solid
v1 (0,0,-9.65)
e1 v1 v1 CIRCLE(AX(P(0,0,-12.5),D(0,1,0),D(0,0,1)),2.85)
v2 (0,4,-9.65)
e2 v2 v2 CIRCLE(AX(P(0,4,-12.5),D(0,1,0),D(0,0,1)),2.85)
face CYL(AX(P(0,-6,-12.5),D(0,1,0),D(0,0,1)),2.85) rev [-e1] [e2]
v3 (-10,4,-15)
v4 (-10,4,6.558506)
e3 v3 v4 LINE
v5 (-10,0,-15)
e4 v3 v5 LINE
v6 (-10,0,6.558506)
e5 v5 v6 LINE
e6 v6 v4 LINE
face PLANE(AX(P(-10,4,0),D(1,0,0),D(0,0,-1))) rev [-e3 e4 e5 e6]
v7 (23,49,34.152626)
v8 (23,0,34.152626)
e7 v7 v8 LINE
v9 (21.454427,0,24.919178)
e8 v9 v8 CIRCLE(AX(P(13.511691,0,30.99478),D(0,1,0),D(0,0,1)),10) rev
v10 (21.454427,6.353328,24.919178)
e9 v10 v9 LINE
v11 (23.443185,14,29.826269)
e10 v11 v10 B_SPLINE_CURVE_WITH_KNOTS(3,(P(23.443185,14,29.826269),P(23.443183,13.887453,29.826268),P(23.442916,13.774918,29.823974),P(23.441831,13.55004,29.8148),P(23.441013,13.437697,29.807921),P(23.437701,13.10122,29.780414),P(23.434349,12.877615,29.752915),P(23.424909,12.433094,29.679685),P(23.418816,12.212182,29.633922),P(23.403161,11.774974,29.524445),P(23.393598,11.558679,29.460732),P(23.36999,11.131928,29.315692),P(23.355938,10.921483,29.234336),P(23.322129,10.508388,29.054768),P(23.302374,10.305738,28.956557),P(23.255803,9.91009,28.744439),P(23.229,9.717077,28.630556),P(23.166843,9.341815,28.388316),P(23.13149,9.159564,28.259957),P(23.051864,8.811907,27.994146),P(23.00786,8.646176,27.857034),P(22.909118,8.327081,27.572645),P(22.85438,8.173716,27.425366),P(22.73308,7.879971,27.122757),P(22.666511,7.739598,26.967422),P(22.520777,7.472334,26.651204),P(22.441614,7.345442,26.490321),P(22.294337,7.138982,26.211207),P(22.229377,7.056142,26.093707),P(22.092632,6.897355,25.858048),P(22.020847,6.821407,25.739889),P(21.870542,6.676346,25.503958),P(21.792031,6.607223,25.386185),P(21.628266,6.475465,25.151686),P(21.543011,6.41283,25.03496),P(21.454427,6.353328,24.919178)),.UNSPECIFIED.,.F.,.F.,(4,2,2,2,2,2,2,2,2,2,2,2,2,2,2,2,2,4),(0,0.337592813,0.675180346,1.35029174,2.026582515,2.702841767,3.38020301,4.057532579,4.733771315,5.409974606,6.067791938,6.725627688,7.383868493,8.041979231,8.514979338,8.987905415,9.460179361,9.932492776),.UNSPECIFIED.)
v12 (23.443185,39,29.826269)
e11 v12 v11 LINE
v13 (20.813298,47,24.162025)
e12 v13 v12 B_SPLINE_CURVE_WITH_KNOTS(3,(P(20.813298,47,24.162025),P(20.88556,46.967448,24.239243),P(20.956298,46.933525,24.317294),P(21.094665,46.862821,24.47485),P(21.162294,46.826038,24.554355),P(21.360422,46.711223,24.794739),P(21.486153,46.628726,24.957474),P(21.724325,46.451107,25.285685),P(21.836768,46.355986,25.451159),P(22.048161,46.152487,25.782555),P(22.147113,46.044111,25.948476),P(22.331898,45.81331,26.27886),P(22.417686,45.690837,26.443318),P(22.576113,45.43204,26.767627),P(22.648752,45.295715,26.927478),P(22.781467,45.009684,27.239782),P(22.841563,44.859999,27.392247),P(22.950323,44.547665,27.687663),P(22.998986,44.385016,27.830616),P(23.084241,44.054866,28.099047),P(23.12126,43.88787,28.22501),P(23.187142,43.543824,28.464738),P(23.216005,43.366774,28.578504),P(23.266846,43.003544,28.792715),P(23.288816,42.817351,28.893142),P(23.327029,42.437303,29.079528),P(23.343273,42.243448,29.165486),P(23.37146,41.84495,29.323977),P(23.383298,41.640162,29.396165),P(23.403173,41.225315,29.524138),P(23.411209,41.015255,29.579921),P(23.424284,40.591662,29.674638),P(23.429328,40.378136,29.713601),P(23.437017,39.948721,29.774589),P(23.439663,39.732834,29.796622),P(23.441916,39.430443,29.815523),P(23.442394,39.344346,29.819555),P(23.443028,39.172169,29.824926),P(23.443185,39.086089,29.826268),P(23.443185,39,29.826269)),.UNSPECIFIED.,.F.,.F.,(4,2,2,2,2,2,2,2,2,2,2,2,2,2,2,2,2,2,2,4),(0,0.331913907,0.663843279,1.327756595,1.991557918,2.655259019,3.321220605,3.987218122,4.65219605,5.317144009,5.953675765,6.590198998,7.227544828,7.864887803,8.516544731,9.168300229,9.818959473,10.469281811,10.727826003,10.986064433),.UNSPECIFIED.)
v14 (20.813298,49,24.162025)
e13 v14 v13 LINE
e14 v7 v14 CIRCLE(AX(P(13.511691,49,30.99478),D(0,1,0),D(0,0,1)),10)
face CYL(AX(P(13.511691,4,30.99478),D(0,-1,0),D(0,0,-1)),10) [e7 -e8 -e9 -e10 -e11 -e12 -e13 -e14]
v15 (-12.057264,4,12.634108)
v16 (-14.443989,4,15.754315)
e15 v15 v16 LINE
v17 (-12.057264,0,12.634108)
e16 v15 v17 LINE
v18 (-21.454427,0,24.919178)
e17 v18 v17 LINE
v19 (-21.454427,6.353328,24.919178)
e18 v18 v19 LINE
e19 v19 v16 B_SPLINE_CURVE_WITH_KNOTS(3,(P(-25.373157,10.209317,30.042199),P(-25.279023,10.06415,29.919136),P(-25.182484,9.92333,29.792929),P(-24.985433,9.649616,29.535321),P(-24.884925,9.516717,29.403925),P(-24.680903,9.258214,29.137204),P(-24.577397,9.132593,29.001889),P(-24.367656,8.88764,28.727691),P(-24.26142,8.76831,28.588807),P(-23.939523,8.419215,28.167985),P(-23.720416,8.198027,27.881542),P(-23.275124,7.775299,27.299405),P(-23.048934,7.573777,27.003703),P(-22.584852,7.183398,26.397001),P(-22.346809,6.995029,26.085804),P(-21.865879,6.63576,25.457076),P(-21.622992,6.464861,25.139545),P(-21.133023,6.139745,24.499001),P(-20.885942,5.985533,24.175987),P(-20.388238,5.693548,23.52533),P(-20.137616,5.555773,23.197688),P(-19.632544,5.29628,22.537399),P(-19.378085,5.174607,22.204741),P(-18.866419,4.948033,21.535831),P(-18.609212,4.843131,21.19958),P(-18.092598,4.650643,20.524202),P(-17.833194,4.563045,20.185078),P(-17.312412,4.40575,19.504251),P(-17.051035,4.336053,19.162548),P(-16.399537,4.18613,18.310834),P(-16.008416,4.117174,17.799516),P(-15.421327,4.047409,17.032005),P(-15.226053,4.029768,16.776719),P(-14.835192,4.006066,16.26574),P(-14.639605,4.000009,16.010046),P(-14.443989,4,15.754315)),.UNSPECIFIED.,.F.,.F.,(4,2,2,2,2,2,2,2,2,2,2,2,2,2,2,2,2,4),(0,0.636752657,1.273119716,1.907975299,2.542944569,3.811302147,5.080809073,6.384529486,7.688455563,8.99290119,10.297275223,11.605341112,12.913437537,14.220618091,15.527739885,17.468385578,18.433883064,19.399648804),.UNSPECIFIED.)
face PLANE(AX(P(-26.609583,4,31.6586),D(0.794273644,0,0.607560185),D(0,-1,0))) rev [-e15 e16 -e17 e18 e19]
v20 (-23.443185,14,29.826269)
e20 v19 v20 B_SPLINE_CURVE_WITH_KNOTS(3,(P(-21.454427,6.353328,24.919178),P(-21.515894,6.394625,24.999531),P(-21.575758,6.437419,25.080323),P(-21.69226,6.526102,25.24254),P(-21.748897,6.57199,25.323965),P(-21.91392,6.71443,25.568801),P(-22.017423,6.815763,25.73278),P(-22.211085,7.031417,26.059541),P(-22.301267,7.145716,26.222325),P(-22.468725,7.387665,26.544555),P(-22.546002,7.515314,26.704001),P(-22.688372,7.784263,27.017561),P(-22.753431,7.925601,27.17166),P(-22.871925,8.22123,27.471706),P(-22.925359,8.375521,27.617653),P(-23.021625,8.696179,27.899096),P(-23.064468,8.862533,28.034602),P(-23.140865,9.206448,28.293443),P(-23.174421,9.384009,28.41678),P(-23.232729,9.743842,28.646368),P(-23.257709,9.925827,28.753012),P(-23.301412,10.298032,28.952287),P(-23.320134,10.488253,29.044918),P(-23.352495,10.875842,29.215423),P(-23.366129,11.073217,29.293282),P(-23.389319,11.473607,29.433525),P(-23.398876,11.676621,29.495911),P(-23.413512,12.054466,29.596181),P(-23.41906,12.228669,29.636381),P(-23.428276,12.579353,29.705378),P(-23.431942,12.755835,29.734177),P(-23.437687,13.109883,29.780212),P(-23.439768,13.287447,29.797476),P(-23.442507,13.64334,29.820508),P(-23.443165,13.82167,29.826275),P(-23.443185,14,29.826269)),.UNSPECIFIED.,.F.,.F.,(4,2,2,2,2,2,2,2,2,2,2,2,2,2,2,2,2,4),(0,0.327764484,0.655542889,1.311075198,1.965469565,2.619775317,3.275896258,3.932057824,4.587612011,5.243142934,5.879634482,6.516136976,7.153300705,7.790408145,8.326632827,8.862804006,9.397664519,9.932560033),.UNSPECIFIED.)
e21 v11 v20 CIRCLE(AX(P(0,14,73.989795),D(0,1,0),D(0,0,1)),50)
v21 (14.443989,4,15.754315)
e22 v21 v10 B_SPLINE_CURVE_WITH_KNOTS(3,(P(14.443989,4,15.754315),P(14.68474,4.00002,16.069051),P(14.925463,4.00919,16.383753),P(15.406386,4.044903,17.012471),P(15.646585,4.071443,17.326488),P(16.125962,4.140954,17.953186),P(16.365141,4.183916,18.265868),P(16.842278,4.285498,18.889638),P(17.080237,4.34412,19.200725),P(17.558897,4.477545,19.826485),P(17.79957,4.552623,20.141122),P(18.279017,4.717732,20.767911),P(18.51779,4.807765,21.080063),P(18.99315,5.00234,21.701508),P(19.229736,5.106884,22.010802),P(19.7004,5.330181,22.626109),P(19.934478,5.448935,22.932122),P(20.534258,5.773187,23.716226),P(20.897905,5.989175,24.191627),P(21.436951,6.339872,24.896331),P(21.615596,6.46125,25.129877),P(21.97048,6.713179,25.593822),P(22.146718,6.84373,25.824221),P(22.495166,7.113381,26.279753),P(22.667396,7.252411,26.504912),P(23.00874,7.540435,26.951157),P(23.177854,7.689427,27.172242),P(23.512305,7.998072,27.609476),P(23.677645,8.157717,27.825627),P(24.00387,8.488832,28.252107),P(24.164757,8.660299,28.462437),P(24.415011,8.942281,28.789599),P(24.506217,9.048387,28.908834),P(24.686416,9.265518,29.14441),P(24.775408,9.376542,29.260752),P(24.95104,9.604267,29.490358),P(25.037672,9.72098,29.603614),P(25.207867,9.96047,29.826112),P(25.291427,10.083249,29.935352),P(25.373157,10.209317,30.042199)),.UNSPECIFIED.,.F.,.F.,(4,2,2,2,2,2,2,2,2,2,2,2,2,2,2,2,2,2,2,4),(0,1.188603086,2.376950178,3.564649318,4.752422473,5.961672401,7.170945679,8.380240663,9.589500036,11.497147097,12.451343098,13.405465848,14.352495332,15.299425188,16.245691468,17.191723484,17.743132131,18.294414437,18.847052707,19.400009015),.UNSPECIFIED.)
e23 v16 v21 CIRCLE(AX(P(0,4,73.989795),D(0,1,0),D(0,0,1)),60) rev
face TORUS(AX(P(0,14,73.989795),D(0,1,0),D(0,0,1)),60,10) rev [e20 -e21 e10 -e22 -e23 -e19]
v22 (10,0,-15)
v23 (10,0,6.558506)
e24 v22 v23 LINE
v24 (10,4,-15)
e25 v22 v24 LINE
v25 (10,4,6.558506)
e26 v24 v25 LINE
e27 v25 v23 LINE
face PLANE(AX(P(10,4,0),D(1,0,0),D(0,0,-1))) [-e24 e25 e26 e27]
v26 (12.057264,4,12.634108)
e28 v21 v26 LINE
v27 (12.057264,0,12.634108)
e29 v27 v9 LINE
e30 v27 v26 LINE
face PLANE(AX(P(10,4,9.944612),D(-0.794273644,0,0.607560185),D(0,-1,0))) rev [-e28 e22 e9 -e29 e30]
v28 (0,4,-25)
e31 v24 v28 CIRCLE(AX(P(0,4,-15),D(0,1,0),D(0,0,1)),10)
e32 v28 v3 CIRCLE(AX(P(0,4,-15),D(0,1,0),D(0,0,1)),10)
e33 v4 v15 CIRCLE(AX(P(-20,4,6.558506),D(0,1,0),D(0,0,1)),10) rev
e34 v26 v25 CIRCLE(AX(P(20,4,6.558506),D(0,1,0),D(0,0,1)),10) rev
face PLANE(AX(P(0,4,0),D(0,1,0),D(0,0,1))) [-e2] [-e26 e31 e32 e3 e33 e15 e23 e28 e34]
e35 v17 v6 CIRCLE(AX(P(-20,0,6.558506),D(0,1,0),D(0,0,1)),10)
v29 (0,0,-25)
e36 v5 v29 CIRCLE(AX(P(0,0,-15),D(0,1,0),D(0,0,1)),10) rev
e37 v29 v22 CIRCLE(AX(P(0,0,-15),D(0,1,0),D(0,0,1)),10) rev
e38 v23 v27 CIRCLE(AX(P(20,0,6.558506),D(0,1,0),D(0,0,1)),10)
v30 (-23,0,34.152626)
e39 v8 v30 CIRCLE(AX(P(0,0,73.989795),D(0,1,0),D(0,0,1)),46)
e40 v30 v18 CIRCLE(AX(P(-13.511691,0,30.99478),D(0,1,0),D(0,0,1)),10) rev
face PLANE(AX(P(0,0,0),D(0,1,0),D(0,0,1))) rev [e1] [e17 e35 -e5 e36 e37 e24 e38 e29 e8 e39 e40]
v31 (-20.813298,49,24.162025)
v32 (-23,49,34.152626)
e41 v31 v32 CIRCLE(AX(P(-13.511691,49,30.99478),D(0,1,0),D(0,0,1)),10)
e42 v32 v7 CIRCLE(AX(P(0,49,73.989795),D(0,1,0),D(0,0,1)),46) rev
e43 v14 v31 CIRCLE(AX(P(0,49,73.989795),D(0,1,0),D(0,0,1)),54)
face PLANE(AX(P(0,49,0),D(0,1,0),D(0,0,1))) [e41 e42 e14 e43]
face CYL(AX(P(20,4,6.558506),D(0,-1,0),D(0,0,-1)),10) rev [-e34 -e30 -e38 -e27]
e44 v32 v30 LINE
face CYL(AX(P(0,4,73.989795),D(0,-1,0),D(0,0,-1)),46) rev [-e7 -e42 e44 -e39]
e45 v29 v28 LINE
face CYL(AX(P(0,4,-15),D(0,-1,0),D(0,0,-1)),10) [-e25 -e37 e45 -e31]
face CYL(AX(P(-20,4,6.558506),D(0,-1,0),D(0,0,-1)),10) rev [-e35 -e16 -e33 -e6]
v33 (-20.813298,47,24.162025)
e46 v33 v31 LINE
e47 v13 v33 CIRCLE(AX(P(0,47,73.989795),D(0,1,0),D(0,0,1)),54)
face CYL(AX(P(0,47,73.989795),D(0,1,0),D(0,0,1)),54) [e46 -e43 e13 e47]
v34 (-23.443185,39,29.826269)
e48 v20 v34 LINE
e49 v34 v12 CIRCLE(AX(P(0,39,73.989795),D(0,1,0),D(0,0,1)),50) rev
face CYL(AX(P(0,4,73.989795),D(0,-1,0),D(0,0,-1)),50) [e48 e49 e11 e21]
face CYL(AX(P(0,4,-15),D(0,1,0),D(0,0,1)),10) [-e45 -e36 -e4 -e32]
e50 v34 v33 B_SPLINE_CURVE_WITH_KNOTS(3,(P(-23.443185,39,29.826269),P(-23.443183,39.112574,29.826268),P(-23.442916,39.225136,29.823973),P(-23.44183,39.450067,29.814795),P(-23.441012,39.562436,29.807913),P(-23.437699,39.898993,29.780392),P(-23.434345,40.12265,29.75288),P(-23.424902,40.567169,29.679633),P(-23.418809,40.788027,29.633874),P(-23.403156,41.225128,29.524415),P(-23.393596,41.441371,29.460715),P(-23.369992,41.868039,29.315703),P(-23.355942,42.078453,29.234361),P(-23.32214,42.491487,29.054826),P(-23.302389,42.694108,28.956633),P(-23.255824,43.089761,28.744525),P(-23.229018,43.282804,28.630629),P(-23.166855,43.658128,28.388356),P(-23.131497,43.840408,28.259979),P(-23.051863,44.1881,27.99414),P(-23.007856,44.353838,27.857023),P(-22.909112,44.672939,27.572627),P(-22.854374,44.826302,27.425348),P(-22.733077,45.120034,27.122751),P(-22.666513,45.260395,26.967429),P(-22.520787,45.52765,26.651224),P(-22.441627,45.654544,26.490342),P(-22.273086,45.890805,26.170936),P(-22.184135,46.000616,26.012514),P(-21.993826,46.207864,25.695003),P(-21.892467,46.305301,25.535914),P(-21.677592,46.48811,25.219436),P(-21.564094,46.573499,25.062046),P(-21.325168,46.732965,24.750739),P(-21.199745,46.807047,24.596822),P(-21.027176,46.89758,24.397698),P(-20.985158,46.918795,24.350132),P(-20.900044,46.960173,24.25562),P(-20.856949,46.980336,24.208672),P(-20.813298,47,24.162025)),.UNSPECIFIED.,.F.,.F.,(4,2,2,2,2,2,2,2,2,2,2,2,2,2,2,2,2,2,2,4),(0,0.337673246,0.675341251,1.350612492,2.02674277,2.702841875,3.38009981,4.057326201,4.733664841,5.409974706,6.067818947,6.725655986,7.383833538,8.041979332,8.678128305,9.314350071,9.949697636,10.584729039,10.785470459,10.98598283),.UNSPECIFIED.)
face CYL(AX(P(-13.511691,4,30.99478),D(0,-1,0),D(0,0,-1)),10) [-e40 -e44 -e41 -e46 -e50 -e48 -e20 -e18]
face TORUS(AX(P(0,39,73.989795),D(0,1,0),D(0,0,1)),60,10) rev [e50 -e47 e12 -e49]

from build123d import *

# Parameters (mm, degrees)
EXTRUDE_1_DEPTH     = 4
SKETCH_2_R          = 2.85
CUT_EXTRUDE_1_DEPTH = 10.000000000000002
EXTRUDE_2_DEPTH     = 45
FILLET_1_R          = 10
EXTRUDE_START       = -2
EXTRUDE_3_DEPTH     = 2
FILLET_2_R          = 10
FILLET_3_DEPTH      = 50
FILLET_START        = 44.37538
FILLET_3_2_DEPTH    = 5.62462
FILLET_3_3_DEPTH    = 4


with BuildPart() as part:
    # 草图1 → 凸台-拉伸1 (new body)
    with BuildSketch(Plane(origin=(0, 0, 0), x_dir=(1, 0, 0), z_dir=(0, 1, 0))):
        with BuildLine():
            ThreePointArc((-10, -25), (5.66e-15, -23.98979485566356), (10.000000000000009, -25))
            Line((10.000000000000002, -25.000000000000007), (9.999999999999996, 24.999999999999993))
            Line((9.999999999999996, 24.999999999999993), (-10.000000000000004, 24.999999999999993))
            Line((-10.000000000000004, 24.999999999999993), (-9.999999999999996, -25.000000000000007))
        make_face()
        with BuildLine():
            ThreePointArc((-23.00000000000064, -34.15262628157976), (5.42e-15, -27.98979485566356), (23.000000000000654, -34.15262628157976))
            Line((23.000000000000064, -34.15262628157941), (25.00000000000006, -30.688524666441673))
            ThreePointArc((25.000000000000064, -30.688524666441666), (17.729631361654985, -27.23875024936818), (10.000000000000009, -25))
            Line((10.000000000000004, -25.000000000000007), (-9.999999999999996, -25.000000000000007))
            ThreePointArc((-10, -25), (-17.72963136165498, -27.23875024936818), (-25.000000000000064, -30.688524666441673))
            Line((-25.00000000000006, -30.688524666441673), (-23.000000000000057, -34.152626281579415))
        make_face()
        with BuildLine():
            Line((-9.999999999999996, -25.000000000000007), (10.000000000000004, -25.000000000000007))
            ThreePointArc((10.000000000000009, -25), (5.66e-15, -23.98979485566356), (-10, -25))
        make_face()
    extrude(amount=EXTRUDE_1_DEPTH)

    # 草图2 → 切除-拉伸1 (cut)
    with BuildSketch(Plane(origin=(0, 4, 0), x_dir=(1, 0, 0), z_dir=(0, 1, 0))):
        with Locations(Location((-1.73e-15, 12.499999999999996, 0), (0, 0, 270))):
            Circle(SKETCH_2_R)
    extrude(amount=-CUT_EXTRUDE_1_DEPTH, mode=Mode.SUBTRACT)

    # 草图3 → 凸台-拉伸2 (add)
    with BuildSketch(Plane(origin=(0, 4, 0), x_dir=(1, 0, 0), z_dir=(0, 1, 0))):
        with BuildLine():
            ThreePointArc((9.999999999999995, -25.000000000000007), (5.66e-15, -23.989794855663575), (-9.999999999999996, -25.000000000000014))
            ThreePointArc((-9.999999999999996, -25.000000000000014), (-17.729631361654977, -27.238750249368195), (-25.000000000000057, -30.68852466644168))
            Line((-25.000000000000064, -30.68852466644167), (-23.00000000000006, -34.152626281579415))
            ThreePointArc((-23.000000000000064, -34.152626281579415), (-5.33e-15, -27.98979485566356), (23.000000000000064, -34.15262628157941))
            Line((23.000000000000057, -34.152626281579415), (25.00000000000006, -30.688524666441673))
            ThreePointArc((25.000000000000057, -30.68852466644168), (17.72963136165498, -27.238750249368195), (9.999999999999995, -25.000000000000007))
        make_face()
    extrude(amount=EXTRUDE_2_DEPTH)

    # 倒角1
    # the kernel refuses this chamfer: 25.647736894, 20 mm, written as the material it adds along each edge
    with BuildSketch(Plane(origin=(10.000000000000004, 0, 25.00000000000001), x_dir=(-2.4e-16, 0, -1), z_dir=(0, 1, 0))) as chamfer_1_piece_1_section:
        with BuildLine():
            Line((15.870240384772439, 0.6233017511174166), (-7.473452483423025, -17.23288480714665))
            Line((-7.473452483423025, -17.23288480714665), (-7.907732226484158, -16.959894573117097))
            ThreePointArc((-7.907732226484158, -16.959894573117097), (-3.2240953608677487, -8.827331157857245), (-0.5025909475750687, 0.10259094757506672))
            Line((-0.5025909475750687, 0.10259094757506672), (1.2e-16, 0.5129547378753365))
            ThreePointArc((1.2e-16, 0.5129547378753365), (7.9351201923862185, 0.5129547378753364), (15.870240384772439, 1.136256488992753))
            Line((15.870240384772439, 1.136256488992753), (15.870240384772439, 0.6233017511174166))
        make_face()
    chamfer_1_piece_1 = extrude(amount=4, mode=Mode.PRIVATE)
    chamfer_1_piece_1 = split(chamfer_1_piece_1, bisect_by=Plane(origin=(23.713203435596473, 0, 32.91732169499376), z_dir=(-0.8660254037844379, 0, -0.5000000000000014)), keep=Keep.TOP, mode=Mode.PRIVATE)
    add(chamfer_1_piece_1)
    with BuildSketch(Plane(origin=(-9.999999999999996, 0, 25.000000000000007), x_dir=(-1.2e-16, 0, -1), z_dir=(0, 1, 0))) as chamfer_1_piece_2_section:
        with BuildLine():
            Line((15.8702403847722, -0.6233017511174258), (-7.473452483423406, 17.232884807146757))
            Line((-7.473452483423406, 17.232884807146757), (-7.907732226484546, 16.959894573117197))
            ThreePointArc((-7.907732226484546, 16.959894573117197), (-3.224095360867959, 8.827331157857294), (-0.5025909475750723, -0.10259094757507187))
            Line((-0.5025909475750723, -0.10259094757507187), (-6e-17, -0.5129547378753436))
            ThreePointArc((-6e-17, -0.5129547378753436), (7.935120192386101, -0.5129547378753427), (15.8702403847722, -1.1362564889927693))
            Line((15.8702403847722, -1.1362564889927693), (15.8702403847722, -0.6233017511174258))
        make_face()
    chamfer_1_piece_2 = extrude(amount=4, mode=Mode.PRIVATE)
    chamfer_1_piece_2 = split(chamfer_1_piece_2, bisect_by=Plane(origin=(-23.713203435596462, 0, 32.917321694993774), z_dir=(0.8660254037844375, 0, -0.500000000000002)), keep=Keep.TOP, mode=Mode.PRIVATE)
    add(chamfer_1_piece_2)

    # 圆角1
    fillet_1_edges = [part.edges().sort_by_distance(p)[0] for p in [
        (3.375e-14, 4, 23.989794855663604),
    ]]
    fillet(fillet_1_edges, radius=FILLET_1_R)

    # 草图4 → 凸台-拉伸3 (add)
    with BuildSketch(Plane(origin=(0, 49, 0), x_dir=(1, 0, 0), z_dir=(0, 1, 0)).offset(EXTRUDE_START)):
        with BuildLine():
            Line((-27.00000000000007, -27.22442305130391), (-25.00000000000007, -30.68852466644167))
            ThreePointArc((-25.00000000000007, -30.68852466644167), (5.66e-15, -23.98979485566357), (25.00000000000006, -30.688524666441673))
            Line((25.00000000000006, -30.688524666441673), (27.00000000000007, -27.22442305130391))
            ThreePointArc((27.00000000000007, -27.22442305130391), (5.91e-15, -19.989794855663554), (-27.00000000000007, -27.22442305130391))
        make_face()
    extrude(amount=EXTRUDE_3_DEPTH)

    # 圆角2
    # the kernel refuses this fillet: 10 mm, written as the material it adds along each edge
    with BuildSketch(Plane(origin=(-7.11e-15, 47, 73.9897948556636), x_dir=(-0.5000000000000009, 0, -0.8660254037844382), z_dir=(-0.8660254037844382, 0, 0.5000000000000009))) as fillet_2_piece_1:
        with BuildLine():
            CenterArc((60.000000000000014, 8.000000000000028), FILLET_2_R, 180, 53.13010235415629)
            Line((50.00000000000002, 8.000000000000028), (49.80000000000001, 8.000000000000028))
            Line((49.80000000000001, 8.000000000000028), (49.80000000000004, 0))
            Line((49.80000000000004, 0), (50.000000000000036, -0.20000000000000284))
            ThreePointArc((50.000000000000036, -0.20000000000000284), (52.000000000000036, -0.20000000000000284), (53.88000000000005, -0.1600000000000037))
            Line((53.88000000000005, -0.1600000000000037), (54.00000000000006, 0))
        make_face()
    revolve(axis=Axis((-7.11e-15, 47, 73.9897948556636), (0, -1, 0)), revolution_arc=60.000000000000135)

    # 圆角3: read off the stored shape, not the designer's step
    # 圆角3 outline → 圆角3 (cut)
    with BuildSketch(Plane(origin=(0, 0, 0), x_dir=(1, 0, 0), z_dir=(0, 1, 0))):
        with BuildLine():
            ThreePointArc((-23, -34.152626282), (-23.374473484, -29.343864194), (-21.454427524, -24.919178135))
            Line((-21.454427524, -24.919178135), (-20.904466424, -24.200204744))
            ThreePointArc((-20.904466424, -24.200204744), (-23.999915623, -25.616206503), (-27, -27.224423051))
            Line((-27, -27.224423051), (-23, -34.152626282))
        make_face()
        with BuildLine():
            Line((23, -34.152626282), (27, -27.224423051))
            ThreePointArc((27, -27.224423051), (23.999915623, -25.616206503), (20.904466424, -24.200204744))
            Line((20.904466424, -24.200204744), (21.454427366, -24.919177929))
            ThreePointArc((21.454427366, -24.919177929), (23.374473462, -29.343864066), (23, -34.152626282))
        make_face()
        with BuildLine():
            Line((-10, 25), (-10, 15))
            ThreePointArc((-10, 15), (-7.071067812, 22.071067812), (0, 25))
            Line((0, 25), (-10, 25))
        make_face()
        with BuildLine():
            Line((10, 25), (0, 25))
            ThreePointArc((0, 25), (7.071067812, 22.071067812), (10, 15))
            Line((10, 15), (10, 25))
        make_face()
    extrude(amount=FILLET_3_DEPTH, mode=Mode.SUBTRACT)

    # Fillet 3 2 outline → Fillet 3 2 (cut)
    with BuildSketch(Plane(origin=(0, 0, 0), x_dir=(1, 0, 0), z_dir=(0, 1, 0)).offset(FILLET_START)):
        with BuildLine():
            Line((-20.904466424, -24.200204744), (-21.454427524, -24.919178135))
            ThreePointArc((-21.454427524, -24.919178135), (-21.143258439, -24.532645684), (-20.813297877, -24.162025174))
            ThreePointArc((-20.813297877, -24.162025174), (-20.858890886, -24.1810941), (-20.904466424, -24.200204744))
        make_face()
        with BuildLine():
            ThreePointArc((20.904466424, -24.200204744), (20.858890886, -24.1810941), (20.813297877, -24.162025174))
            ThreePointArc((20.813297877, -24.162025174), (21.143258356, -24.532645585), (21.454427366, -24.919177929))
            Line((21.454427366, -24.919177929), (20.904466424, -24.200204744))
        make_face()
    extrude(amount=FILLET_3_2_DEPTH, mode=Mode.SUBTRACT)

    # Fillet 3 3 outline → Fillet 3 3 (add)
    with BuildSketch(Plane(origin=(0, 0, 0), x_dir=(1, 0, 0), z_dir=(0, 1, 0))):
        with BuildLine():
            ThreePointArc((-10, -6.558505859), (-10.528269314, -9.765734851), (-12.057263561, -12.634107711))
            Line((-12.057263561, -12.634107711), (-10, -9.944612473))
            Line((-10, -9.944612473), (-10, -6.558505859))
        make_face()
        with BuildLine():
            Line((10, -9.944612473), (12.057263561, -12.634107711))
            ThreePointArc((12.057263561, -12.634107711), (10.528269314, -9.765734851), (10, -6.558505859))
            Line((10, -6.558505859), (10, -9.944612473))
        make_face()
    extrude(amount=FILLET_3_3_DEPTH)


solid = part.part
